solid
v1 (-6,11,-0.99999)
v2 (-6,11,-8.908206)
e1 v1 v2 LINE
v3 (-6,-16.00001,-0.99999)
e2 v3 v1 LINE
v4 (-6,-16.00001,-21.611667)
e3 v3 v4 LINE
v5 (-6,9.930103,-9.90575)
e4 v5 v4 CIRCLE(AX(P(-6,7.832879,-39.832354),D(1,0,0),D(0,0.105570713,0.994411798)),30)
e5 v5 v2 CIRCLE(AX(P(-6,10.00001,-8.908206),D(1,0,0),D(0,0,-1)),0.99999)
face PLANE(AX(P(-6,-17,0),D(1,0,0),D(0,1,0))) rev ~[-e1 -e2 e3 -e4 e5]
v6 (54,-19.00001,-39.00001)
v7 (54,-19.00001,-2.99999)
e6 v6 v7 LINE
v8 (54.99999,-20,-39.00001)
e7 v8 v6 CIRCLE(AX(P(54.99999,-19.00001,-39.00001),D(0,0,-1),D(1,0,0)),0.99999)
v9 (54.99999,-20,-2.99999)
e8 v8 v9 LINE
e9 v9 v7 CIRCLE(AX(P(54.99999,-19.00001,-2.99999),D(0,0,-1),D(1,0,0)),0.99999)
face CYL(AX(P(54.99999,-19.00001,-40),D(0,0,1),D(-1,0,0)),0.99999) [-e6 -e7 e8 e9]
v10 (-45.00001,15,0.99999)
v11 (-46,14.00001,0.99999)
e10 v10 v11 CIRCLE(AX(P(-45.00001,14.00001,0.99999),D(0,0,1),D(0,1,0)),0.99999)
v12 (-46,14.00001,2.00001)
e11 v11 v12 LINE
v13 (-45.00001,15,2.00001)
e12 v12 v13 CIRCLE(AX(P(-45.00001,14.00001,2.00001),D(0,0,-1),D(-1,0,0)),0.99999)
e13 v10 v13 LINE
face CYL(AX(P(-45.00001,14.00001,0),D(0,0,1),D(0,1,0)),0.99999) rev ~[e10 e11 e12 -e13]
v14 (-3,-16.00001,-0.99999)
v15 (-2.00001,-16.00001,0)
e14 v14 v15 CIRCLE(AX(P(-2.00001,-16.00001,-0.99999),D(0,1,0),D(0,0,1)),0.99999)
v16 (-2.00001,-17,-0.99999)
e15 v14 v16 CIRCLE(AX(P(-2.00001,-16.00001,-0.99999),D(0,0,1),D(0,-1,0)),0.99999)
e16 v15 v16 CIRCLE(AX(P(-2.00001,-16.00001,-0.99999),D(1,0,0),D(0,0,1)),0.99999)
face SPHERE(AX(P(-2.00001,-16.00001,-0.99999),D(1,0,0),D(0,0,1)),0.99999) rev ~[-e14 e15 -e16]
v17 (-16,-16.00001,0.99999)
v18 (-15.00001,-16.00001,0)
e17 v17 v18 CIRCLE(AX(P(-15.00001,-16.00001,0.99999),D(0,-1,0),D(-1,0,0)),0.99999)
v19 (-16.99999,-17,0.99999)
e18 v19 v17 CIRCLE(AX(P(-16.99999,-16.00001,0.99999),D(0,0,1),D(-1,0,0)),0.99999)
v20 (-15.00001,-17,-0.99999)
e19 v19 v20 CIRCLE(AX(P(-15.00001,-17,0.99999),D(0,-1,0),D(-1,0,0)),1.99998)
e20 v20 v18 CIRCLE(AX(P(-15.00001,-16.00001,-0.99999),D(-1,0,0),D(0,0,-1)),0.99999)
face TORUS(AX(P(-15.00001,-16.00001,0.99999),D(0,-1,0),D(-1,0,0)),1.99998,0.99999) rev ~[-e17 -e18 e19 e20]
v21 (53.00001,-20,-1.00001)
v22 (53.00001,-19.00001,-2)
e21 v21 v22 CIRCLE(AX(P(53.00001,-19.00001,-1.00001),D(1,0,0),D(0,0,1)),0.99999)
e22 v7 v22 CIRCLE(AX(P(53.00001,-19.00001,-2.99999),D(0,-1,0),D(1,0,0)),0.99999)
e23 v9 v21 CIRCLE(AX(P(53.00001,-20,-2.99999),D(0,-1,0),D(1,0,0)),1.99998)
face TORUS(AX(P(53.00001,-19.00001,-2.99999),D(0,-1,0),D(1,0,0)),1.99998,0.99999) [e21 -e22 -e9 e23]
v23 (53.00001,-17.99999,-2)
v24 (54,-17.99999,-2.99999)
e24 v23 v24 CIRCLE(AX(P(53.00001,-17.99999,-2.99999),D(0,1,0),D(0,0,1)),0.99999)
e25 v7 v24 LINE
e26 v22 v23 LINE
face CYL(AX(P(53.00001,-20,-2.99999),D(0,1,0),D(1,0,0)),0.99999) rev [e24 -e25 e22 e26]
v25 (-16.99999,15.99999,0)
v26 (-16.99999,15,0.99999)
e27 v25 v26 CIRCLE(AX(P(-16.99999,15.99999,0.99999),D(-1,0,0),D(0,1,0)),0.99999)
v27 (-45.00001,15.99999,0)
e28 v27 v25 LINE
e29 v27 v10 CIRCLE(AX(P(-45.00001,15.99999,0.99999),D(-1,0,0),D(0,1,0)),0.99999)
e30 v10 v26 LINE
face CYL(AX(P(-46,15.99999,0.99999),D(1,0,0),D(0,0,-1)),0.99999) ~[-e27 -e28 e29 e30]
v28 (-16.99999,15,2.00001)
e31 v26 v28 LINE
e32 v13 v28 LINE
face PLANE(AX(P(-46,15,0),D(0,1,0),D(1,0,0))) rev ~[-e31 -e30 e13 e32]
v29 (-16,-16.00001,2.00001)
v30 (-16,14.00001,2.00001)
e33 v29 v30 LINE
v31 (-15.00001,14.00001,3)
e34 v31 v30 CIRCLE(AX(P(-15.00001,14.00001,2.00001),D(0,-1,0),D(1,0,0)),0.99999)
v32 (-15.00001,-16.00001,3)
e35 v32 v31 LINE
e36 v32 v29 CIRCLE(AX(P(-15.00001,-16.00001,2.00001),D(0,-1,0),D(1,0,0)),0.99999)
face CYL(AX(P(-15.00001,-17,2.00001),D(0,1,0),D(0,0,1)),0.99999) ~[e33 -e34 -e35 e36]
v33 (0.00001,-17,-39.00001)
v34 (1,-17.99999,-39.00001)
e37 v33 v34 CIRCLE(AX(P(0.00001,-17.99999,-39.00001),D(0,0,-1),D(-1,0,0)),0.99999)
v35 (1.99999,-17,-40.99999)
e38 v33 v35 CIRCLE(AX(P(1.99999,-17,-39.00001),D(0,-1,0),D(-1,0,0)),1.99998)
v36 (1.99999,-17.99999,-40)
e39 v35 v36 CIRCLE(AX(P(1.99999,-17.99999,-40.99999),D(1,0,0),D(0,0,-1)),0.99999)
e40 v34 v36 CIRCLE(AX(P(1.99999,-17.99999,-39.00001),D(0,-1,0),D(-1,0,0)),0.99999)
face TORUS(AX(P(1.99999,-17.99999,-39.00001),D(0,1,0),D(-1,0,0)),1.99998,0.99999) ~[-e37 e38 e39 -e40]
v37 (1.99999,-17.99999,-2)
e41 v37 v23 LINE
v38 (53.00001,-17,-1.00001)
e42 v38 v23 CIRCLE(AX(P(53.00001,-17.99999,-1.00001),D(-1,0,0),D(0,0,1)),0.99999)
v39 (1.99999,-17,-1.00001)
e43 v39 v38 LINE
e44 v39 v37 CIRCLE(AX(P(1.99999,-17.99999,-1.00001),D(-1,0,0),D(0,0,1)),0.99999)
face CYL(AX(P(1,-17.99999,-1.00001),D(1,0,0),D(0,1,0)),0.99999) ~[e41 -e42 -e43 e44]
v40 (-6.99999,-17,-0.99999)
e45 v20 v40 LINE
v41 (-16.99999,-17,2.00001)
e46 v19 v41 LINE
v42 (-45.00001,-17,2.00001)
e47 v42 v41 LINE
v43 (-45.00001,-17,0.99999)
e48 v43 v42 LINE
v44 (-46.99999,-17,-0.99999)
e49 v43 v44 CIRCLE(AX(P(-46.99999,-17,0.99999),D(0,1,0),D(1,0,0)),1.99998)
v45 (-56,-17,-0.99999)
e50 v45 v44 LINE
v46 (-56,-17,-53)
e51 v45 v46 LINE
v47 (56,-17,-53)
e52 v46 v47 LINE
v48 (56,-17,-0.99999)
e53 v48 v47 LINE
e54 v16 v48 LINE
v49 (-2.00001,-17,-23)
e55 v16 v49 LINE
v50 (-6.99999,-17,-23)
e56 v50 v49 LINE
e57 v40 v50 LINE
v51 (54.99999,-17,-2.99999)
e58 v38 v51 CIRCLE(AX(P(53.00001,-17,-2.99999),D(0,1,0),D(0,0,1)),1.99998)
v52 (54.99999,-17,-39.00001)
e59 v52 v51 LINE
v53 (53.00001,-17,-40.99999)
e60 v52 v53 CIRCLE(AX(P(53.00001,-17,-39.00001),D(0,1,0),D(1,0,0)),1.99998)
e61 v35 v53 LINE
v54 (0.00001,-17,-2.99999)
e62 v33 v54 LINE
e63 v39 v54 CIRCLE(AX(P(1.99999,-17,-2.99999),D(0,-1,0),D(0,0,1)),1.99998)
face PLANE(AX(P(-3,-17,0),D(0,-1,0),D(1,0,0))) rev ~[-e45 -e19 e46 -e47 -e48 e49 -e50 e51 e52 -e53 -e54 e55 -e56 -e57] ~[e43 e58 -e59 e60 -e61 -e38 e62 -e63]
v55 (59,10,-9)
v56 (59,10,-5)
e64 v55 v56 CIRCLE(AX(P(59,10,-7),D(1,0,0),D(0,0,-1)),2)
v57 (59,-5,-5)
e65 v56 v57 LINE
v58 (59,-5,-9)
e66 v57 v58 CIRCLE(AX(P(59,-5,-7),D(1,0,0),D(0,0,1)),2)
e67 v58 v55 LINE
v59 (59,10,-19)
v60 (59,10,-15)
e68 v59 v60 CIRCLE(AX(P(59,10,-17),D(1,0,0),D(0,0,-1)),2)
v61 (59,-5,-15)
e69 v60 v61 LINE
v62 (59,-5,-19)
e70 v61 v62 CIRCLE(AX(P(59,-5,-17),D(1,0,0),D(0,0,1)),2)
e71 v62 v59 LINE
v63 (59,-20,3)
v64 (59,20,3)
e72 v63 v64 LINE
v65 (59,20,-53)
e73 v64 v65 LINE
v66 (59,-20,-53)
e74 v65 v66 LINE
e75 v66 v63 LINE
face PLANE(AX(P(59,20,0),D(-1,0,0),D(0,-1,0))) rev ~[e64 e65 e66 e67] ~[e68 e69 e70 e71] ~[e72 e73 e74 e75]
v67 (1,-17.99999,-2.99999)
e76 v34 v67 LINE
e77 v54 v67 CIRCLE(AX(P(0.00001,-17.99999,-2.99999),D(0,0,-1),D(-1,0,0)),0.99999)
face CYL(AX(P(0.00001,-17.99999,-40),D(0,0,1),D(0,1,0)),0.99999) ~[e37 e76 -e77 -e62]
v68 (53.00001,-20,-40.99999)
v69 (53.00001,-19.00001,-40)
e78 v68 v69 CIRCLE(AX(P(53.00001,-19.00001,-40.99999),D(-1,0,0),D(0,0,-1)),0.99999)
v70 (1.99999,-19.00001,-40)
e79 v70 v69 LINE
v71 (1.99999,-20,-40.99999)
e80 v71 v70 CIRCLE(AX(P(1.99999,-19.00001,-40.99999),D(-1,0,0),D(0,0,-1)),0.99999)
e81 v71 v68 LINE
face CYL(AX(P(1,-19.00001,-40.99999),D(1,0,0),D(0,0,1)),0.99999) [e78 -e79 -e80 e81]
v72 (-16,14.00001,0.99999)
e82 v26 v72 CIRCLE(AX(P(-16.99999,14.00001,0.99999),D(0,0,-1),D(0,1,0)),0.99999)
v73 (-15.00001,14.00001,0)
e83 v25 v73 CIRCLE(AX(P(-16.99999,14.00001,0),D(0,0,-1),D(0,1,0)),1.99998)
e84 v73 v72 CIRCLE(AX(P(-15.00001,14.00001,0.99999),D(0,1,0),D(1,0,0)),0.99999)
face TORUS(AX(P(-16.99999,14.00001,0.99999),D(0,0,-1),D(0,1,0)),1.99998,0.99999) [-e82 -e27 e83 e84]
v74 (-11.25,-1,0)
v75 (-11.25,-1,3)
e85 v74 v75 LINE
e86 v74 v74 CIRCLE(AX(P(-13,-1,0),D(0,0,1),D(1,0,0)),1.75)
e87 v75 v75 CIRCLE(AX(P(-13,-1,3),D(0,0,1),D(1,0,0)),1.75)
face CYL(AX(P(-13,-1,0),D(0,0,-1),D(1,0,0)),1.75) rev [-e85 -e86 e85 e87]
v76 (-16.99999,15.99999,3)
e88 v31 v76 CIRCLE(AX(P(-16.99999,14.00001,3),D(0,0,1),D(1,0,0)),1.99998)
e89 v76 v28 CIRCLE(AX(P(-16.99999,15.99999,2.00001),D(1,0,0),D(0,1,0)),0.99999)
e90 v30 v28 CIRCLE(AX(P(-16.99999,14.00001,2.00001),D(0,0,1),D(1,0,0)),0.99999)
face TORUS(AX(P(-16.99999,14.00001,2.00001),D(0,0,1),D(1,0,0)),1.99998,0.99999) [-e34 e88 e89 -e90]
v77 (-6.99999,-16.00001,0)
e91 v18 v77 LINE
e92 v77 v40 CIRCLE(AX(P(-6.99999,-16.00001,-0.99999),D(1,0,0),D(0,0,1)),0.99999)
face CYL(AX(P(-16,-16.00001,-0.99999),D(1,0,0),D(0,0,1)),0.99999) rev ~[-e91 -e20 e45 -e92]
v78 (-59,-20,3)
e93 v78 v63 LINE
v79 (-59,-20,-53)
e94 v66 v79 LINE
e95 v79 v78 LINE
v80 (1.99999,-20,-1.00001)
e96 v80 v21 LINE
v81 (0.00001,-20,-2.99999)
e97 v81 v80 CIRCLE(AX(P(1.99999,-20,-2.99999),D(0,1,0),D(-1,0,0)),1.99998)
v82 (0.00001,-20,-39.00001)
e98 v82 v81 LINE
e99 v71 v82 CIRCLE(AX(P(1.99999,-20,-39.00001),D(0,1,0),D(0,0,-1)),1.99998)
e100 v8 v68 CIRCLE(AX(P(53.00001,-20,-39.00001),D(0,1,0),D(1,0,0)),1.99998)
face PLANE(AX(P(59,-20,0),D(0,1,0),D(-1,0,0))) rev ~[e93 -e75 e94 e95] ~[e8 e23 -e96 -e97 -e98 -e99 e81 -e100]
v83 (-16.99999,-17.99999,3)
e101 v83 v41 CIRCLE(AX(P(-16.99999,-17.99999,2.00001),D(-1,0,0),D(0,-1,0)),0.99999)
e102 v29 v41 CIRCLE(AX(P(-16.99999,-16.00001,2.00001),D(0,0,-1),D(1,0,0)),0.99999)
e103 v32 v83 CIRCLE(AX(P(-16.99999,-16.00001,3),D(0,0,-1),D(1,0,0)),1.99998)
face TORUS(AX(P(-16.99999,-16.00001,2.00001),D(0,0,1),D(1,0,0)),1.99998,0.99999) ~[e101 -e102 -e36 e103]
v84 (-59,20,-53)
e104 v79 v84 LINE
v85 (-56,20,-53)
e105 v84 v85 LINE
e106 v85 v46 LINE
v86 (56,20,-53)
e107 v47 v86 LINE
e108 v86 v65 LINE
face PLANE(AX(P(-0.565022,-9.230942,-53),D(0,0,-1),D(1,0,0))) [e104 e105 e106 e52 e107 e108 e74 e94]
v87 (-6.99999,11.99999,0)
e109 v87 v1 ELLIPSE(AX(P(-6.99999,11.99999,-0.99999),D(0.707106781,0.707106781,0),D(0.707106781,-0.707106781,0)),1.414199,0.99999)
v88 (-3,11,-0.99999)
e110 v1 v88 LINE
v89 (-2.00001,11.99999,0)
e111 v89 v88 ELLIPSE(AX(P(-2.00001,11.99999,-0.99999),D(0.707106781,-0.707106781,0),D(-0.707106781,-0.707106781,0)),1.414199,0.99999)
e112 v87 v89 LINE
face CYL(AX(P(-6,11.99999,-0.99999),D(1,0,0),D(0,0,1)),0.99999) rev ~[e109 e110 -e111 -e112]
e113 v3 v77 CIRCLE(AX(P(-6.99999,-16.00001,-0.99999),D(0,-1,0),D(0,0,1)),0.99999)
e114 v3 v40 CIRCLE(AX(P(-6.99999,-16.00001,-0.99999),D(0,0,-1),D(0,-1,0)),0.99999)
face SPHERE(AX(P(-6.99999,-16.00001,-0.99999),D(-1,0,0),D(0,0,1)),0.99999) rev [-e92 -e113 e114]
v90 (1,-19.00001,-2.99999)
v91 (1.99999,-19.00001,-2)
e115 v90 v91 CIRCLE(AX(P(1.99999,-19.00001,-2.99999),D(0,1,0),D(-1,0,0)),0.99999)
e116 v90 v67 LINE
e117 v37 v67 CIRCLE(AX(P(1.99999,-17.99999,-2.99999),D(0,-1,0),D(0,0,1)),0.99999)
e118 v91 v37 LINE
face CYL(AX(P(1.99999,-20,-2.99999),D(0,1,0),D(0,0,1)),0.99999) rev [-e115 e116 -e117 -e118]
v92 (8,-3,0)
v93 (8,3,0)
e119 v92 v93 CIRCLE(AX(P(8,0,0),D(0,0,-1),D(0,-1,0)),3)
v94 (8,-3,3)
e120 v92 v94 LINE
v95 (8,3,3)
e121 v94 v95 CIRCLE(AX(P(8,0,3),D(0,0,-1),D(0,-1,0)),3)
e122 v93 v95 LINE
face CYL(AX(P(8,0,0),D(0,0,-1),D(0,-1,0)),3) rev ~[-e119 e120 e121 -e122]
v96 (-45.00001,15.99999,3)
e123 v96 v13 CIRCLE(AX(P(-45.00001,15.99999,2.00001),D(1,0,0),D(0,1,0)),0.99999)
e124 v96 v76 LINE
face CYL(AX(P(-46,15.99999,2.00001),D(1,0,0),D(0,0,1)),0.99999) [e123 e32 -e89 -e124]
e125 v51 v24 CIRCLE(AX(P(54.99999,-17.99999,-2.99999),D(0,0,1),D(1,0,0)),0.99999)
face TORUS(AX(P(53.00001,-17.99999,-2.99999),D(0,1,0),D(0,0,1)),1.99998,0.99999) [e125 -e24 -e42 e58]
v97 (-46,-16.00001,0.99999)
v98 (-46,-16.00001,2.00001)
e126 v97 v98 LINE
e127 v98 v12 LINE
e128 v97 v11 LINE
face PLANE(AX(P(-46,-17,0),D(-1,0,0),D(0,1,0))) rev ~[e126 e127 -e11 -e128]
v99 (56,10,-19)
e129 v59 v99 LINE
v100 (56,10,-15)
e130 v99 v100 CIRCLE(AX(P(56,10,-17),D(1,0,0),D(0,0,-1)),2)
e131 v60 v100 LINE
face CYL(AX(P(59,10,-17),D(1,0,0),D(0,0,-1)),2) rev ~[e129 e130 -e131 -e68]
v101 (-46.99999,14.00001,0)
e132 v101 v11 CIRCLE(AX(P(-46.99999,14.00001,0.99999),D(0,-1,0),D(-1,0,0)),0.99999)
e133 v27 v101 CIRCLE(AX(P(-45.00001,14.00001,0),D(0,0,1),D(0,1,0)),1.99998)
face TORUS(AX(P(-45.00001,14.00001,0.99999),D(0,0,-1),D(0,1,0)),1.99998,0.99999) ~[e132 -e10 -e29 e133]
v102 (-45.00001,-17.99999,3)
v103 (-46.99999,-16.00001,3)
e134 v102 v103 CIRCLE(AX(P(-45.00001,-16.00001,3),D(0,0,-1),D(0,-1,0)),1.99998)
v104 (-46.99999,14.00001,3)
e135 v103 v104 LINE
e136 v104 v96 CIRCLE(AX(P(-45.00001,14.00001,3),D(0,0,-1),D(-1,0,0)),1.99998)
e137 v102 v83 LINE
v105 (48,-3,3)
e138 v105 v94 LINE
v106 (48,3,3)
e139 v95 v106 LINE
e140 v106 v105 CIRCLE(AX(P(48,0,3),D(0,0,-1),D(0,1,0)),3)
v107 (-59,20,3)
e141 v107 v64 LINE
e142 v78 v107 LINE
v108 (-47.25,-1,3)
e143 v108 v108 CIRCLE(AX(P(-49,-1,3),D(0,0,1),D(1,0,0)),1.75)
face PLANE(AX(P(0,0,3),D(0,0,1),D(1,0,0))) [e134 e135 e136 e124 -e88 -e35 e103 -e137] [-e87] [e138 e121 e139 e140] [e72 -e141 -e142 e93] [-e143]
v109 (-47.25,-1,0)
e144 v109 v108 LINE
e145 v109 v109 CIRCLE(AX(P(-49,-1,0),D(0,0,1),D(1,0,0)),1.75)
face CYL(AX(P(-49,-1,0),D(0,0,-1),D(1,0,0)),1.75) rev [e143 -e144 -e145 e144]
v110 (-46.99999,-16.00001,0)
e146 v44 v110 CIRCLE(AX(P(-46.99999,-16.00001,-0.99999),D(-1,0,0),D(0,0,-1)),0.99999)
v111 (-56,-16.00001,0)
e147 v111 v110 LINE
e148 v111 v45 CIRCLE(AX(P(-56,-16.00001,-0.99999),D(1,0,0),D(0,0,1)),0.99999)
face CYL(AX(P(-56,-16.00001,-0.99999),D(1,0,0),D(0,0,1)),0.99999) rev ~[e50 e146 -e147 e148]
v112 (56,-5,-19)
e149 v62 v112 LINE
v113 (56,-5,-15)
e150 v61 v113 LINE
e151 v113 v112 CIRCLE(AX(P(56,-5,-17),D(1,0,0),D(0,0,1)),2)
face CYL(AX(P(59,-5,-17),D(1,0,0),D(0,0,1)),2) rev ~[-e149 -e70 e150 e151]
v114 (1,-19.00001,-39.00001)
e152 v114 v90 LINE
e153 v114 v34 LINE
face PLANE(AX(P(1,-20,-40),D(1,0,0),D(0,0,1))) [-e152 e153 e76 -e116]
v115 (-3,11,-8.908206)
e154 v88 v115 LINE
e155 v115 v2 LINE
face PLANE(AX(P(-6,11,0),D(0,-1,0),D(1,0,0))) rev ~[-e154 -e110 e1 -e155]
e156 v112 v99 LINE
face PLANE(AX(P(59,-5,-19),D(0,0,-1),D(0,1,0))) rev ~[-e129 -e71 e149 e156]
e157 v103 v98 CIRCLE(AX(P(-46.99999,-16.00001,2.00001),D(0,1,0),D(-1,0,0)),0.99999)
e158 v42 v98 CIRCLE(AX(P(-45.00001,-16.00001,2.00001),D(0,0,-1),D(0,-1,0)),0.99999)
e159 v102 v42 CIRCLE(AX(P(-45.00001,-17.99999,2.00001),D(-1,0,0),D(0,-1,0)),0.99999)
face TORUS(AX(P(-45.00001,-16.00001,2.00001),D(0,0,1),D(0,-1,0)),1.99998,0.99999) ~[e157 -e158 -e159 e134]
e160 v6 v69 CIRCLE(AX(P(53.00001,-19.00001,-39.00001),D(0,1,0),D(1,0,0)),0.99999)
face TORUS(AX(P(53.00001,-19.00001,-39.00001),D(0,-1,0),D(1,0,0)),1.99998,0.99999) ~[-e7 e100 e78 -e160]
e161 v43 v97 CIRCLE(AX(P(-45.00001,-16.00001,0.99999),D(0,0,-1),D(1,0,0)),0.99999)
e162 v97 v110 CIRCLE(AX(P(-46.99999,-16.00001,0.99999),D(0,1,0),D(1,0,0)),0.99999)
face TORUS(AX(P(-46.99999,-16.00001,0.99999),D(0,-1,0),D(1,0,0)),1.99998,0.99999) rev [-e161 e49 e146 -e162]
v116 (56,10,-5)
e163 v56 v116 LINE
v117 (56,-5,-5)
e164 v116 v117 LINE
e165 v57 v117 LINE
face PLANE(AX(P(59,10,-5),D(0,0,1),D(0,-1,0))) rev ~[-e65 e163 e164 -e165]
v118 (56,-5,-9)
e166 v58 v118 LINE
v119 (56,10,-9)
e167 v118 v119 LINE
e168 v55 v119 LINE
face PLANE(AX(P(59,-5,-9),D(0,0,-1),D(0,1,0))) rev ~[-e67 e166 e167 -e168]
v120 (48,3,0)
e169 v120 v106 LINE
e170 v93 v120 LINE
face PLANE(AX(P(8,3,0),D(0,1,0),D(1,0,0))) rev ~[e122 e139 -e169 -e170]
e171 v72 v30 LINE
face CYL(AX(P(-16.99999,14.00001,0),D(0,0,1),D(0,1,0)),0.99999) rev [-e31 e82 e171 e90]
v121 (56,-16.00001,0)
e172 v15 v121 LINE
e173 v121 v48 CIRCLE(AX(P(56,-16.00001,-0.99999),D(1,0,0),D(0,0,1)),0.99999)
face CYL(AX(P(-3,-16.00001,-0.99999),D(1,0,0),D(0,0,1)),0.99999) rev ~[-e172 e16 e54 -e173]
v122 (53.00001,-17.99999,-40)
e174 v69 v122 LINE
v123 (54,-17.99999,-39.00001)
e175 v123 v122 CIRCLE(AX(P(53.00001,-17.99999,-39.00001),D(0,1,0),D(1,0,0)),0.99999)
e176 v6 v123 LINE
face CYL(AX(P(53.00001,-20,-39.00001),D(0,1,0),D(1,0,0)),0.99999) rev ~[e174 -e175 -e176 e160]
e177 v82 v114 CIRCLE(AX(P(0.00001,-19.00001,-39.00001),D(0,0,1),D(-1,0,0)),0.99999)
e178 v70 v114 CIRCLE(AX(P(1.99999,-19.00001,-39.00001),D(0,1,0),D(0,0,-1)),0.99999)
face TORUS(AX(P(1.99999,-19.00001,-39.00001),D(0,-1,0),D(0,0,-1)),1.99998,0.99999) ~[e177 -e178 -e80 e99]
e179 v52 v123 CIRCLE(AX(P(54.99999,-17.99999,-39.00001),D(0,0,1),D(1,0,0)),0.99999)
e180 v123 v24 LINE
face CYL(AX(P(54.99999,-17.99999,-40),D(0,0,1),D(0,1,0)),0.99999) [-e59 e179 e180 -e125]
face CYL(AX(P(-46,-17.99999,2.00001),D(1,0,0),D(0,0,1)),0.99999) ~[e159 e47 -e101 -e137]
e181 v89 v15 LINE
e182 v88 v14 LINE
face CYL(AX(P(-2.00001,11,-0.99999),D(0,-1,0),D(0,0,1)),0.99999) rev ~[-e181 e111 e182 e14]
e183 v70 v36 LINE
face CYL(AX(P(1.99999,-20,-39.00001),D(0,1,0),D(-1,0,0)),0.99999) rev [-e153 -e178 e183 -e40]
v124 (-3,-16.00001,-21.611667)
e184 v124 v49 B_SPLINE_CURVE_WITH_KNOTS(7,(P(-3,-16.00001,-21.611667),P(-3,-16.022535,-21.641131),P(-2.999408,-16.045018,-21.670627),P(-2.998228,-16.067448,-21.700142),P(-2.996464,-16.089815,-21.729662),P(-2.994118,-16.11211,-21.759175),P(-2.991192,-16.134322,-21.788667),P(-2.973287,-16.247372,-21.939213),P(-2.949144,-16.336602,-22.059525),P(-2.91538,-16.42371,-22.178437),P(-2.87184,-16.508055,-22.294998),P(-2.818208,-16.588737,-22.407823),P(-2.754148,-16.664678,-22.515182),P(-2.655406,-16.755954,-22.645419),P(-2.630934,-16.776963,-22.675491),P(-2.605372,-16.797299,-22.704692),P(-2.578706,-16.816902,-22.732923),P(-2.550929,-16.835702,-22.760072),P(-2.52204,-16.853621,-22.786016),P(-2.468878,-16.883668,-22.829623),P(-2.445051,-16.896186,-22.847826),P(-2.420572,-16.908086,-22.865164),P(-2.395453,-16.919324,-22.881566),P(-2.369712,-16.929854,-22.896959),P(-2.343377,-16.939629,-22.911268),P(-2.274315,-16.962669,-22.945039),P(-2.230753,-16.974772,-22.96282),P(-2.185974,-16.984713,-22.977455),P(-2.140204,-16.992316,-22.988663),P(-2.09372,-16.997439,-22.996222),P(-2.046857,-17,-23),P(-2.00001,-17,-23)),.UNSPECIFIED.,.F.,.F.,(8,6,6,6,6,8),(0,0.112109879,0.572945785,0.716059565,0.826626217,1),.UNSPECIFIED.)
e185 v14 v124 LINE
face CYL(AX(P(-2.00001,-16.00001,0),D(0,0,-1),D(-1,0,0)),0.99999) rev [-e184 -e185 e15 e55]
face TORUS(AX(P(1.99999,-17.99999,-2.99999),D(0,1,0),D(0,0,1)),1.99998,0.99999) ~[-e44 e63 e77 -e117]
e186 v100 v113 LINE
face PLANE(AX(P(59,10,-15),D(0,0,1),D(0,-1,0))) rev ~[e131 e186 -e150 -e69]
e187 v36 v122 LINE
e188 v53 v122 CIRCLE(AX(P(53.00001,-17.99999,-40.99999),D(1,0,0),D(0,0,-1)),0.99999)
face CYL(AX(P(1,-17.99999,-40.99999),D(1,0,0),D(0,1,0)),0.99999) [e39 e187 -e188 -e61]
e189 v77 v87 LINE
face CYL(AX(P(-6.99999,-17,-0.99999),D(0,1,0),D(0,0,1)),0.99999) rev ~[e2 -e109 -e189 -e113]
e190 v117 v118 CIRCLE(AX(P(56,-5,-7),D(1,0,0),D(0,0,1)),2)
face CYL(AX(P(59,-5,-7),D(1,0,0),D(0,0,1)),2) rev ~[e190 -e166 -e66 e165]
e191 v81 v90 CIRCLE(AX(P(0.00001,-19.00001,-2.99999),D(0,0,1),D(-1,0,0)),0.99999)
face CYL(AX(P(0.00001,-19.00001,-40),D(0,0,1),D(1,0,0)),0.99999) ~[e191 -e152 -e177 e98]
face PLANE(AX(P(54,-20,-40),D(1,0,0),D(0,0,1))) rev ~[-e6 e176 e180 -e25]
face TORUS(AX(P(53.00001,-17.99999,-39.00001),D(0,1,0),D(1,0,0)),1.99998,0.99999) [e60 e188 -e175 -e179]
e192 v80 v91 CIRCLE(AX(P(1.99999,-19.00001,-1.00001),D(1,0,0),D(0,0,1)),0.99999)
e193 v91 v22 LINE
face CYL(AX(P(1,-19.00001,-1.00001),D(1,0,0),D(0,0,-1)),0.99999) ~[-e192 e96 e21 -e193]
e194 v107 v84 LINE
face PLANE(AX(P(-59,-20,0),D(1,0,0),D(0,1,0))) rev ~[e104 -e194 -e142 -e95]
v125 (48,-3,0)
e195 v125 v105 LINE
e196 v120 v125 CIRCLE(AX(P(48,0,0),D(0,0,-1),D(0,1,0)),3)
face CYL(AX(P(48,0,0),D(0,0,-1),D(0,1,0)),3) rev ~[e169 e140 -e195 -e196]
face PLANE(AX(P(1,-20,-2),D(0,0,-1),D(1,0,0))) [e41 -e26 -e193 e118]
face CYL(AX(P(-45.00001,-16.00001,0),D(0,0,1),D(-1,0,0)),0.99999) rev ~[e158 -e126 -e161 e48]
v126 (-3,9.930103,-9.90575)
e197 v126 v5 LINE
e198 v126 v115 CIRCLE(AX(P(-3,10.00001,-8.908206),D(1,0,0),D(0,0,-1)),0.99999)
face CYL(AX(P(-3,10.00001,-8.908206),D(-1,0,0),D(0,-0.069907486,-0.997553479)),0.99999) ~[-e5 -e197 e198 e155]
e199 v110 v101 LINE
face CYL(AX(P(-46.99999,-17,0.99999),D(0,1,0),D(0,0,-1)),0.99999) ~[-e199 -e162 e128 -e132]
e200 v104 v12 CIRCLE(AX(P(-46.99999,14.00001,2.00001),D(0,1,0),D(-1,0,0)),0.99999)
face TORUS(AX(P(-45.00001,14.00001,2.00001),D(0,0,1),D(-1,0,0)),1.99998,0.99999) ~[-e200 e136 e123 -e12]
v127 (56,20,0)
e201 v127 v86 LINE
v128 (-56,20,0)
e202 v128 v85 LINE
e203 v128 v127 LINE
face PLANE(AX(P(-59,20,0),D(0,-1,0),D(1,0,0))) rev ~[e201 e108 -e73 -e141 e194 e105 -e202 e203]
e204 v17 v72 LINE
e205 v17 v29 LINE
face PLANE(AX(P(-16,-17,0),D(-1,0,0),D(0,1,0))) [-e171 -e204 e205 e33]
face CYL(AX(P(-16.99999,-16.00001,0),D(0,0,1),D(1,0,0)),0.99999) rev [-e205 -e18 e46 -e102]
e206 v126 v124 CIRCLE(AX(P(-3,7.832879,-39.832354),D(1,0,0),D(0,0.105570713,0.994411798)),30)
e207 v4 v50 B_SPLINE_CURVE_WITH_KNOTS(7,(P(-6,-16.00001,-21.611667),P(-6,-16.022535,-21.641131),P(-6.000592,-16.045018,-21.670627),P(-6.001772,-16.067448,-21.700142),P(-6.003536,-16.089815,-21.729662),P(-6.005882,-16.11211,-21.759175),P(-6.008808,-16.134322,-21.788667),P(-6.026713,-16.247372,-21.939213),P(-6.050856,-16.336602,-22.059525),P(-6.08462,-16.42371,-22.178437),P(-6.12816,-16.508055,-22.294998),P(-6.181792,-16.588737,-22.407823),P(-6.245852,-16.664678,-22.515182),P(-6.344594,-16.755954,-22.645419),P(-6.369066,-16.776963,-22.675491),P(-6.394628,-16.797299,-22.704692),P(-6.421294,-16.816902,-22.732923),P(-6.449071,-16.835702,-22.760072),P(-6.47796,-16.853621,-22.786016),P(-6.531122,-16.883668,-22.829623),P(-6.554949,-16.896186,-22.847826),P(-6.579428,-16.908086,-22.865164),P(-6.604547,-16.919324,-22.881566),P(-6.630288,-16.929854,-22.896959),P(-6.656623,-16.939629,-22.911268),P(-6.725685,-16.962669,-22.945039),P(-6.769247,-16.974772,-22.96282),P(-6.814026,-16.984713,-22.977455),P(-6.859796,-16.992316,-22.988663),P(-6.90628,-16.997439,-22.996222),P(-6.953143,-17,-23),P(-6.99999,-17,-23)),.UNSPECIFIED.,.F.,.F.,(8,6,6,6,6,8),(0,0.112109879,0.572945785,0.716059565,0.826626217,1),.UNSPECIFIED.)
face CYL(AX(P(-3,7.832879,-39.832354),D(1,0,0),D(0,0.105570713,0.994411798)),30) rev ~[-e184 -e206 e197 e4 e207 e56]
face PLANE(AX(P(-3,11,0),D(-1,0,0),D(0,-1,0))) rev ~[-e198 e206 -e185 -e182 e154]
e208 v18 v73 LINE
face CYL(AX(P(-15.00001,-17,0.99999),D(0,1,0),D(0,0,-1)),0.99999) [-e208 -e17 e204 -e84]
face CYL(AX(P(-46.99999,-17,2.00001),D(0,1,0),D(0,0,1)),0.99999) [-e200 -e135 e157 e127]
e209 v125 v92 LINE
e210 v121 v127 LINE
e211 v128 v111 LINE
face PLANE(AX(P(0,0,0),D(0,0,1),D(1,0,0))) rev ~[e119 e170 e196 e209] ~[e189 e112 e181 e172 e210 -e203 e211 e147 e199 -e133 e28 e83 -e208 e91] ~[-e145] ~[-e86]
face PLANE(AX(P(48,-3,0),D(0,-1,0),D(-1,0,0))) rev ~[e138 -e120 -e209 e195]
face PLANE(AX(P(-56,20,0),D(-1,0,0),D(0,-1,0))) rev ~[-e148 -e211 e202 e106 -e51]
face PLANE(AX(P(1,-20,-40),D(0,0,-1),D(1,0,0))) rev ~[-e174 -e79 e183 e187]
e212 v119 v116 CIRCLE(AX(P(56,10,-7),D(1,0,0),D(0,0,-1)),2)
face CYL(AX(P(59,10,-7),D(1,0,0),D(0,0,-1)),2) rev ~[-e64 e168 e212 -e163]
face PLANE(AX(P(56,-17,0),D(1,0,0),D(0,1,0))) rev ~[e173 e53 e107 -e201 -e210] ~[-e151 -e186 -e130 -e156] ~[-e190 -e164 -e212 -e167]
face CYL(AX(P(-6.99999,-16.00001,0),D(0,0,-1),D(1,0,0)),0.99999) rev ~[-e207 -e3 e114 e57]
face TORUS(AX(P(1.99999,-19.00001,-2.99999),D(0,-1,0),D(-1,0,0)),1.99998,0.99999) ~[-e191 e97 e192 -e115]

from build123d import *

# Parameters (mm, degrees)
F0_W     = 118
F0_H     = 40
F0_R     = 1.75
F0_W_2   = 30
F0_H_2   = 32
F1_DEPTH = 3
F3_DEPTH = 53
F5_DEPTH = 4
F6_W     = 53
F6_H     = 38
F7_DEPTH = 3
F9_DEPTH = 3
F10_R    = 0.99999


# Not quite as in the source:
# - a fillet or chamfer is up to 0.001 mm smaller than in the source, because OpenCascade refuses the exact size


with BuildPart() as f1:
    # F0 (on Top) → F1 (new body)
    with BuildSketch(Plane.XY):
        Rectangle(F0_W, F0_H)
        with Locations((-49, -1)):
            Circle(F0_R, mode=Mode.SUBTRACT)
        with Locations((-31, -1)):
            Rectangle(F0_W_2, F0_H_2, mode=Mode.SUBTRACT)
        with Locations((-13, -1)):
            Circle(F0_R, mode=Mode.SUBTRACT)
        with BuildLine():
            ThreePointArc((8, -3), (5, 0), (8, 3))
            Line((8, 3), (48, 3))
            ThreePointArc((48, 3), (51, 0), (48, -3))
            Line((48, -3), (8, -3))
        make_face(mode=Mode.SUBTRACT)
    extrude(amount=F1_DEPTH)

    # F2 (on face) → F3 (join)
    with BuildSketch(Plane(origin=(0, 0, 0), x_dir=(1, 0, 0), z_dir=(0, 0, -1))):
        Polygon((-56, 20), (-59, 20), (-59, 17), (-59, -20), (-56, -20), (-56, 17), (-46, 17), (-16, 17), (-6, 17), (-6, -11), (-3, -11), (-3, 17), (56, 17), (56, -20), (59, -20), (59, 17), (59, 20), (56, 20), align=None)
    extrude(amount=F3_DEPTH)

    # F4 (on face) → F5 (cut)
    with BuildSketch(Plane.YZ.offset(59)):
        with BuildLine():
            Line((10, -5), (-5, -5))
            ThreePointArc((-5, -5), (-7, -7), (-5, -9))
            Line((-5, -9), (10, -9))
            ThreePointArc((10, -9), (12, -7), (10, -5))
        make_face()
        with BuildLine():
            Line((10, -15), (-5, -15))
            ThreePointArc((-5, -15), (-7, -17), (-5, -19))
            Line((-5, -19), (10, -19))
            ThreePointArc((10, -19), (12, -17), (10, -15))
        make_face()
    extrude(amount=-F5_DEPTH, mode=Mode.SUBTRACT)

    # F6 (on face) → F7 (cut)
    with BuildSketch(Plane.XZ.offset(20)):
        with Locations((27.5, -21)):
            Rectangle(F6_W, F6_H)
    extrude(amount=-F7_DEPTH, mode=Mode.SUBTRACT)

    # F8 (on face) → F9 (cut)
    with BuildSketch(Plane.YZ.offset(-3)):
        with BuildLine():
            Line((-17, -53), (11, -53))
            Line((11, -53), (11, -23))
            Line((11, -23), (11, -10))
            ThreePointArc((11, -10), (-4.8004605743, -12.6220849169), (-17, -23))
            Line((-17, -23), (-17, -53))
        make_face()
    extrude(amount=-F9_DEPTH, mode=Mode.SUBTRACT)

    # F10 (radius 1 in the source; OpenCascade refuses exactly that, so slightly less here)
    f10_edges = [f1.edges().sort_by_distance(p)[0] for p in [
        (26.5, -17, 0),
        (-11, -17, 0),
        (-51, -17, 0),
        (27.5, -17, -2),
        (54, -20, -21),
        (27.5, -20, -40),
        (1, -20, -21),
        (1, -17, -21),
        (54, -17, -21),
        (27.5, -17, -40),
        (-16, -1, 3),
        (-31, -17, 3),
        (-46, -1, 3),
        (-31, 15, 3),
        (-31, 15, 0),
        (-16, -1, 0),
        (-46, -1, 0),
        (27.5, -20, -2),
        (-16, 15, 1.5),
        (-46, 15, 1.5),
        (-46, -17, 1.5),
        (-16, -17, 1.5),
        (54, -18.5, -2),
        (54, -18.5, -40),
        (1, -18.5, -40),
        (1, -18.5, -2),
        (-3, -3, 0),
        (-4.5, 11, 0),
        (-6, -3, 0),
        (-6, -17, -11.5),
        (-3, -17, -11.5),
        (-4.5, 11, -10),
    ]]
    fillet(f10_edges, radius=F10_R)


solid = f1.part
